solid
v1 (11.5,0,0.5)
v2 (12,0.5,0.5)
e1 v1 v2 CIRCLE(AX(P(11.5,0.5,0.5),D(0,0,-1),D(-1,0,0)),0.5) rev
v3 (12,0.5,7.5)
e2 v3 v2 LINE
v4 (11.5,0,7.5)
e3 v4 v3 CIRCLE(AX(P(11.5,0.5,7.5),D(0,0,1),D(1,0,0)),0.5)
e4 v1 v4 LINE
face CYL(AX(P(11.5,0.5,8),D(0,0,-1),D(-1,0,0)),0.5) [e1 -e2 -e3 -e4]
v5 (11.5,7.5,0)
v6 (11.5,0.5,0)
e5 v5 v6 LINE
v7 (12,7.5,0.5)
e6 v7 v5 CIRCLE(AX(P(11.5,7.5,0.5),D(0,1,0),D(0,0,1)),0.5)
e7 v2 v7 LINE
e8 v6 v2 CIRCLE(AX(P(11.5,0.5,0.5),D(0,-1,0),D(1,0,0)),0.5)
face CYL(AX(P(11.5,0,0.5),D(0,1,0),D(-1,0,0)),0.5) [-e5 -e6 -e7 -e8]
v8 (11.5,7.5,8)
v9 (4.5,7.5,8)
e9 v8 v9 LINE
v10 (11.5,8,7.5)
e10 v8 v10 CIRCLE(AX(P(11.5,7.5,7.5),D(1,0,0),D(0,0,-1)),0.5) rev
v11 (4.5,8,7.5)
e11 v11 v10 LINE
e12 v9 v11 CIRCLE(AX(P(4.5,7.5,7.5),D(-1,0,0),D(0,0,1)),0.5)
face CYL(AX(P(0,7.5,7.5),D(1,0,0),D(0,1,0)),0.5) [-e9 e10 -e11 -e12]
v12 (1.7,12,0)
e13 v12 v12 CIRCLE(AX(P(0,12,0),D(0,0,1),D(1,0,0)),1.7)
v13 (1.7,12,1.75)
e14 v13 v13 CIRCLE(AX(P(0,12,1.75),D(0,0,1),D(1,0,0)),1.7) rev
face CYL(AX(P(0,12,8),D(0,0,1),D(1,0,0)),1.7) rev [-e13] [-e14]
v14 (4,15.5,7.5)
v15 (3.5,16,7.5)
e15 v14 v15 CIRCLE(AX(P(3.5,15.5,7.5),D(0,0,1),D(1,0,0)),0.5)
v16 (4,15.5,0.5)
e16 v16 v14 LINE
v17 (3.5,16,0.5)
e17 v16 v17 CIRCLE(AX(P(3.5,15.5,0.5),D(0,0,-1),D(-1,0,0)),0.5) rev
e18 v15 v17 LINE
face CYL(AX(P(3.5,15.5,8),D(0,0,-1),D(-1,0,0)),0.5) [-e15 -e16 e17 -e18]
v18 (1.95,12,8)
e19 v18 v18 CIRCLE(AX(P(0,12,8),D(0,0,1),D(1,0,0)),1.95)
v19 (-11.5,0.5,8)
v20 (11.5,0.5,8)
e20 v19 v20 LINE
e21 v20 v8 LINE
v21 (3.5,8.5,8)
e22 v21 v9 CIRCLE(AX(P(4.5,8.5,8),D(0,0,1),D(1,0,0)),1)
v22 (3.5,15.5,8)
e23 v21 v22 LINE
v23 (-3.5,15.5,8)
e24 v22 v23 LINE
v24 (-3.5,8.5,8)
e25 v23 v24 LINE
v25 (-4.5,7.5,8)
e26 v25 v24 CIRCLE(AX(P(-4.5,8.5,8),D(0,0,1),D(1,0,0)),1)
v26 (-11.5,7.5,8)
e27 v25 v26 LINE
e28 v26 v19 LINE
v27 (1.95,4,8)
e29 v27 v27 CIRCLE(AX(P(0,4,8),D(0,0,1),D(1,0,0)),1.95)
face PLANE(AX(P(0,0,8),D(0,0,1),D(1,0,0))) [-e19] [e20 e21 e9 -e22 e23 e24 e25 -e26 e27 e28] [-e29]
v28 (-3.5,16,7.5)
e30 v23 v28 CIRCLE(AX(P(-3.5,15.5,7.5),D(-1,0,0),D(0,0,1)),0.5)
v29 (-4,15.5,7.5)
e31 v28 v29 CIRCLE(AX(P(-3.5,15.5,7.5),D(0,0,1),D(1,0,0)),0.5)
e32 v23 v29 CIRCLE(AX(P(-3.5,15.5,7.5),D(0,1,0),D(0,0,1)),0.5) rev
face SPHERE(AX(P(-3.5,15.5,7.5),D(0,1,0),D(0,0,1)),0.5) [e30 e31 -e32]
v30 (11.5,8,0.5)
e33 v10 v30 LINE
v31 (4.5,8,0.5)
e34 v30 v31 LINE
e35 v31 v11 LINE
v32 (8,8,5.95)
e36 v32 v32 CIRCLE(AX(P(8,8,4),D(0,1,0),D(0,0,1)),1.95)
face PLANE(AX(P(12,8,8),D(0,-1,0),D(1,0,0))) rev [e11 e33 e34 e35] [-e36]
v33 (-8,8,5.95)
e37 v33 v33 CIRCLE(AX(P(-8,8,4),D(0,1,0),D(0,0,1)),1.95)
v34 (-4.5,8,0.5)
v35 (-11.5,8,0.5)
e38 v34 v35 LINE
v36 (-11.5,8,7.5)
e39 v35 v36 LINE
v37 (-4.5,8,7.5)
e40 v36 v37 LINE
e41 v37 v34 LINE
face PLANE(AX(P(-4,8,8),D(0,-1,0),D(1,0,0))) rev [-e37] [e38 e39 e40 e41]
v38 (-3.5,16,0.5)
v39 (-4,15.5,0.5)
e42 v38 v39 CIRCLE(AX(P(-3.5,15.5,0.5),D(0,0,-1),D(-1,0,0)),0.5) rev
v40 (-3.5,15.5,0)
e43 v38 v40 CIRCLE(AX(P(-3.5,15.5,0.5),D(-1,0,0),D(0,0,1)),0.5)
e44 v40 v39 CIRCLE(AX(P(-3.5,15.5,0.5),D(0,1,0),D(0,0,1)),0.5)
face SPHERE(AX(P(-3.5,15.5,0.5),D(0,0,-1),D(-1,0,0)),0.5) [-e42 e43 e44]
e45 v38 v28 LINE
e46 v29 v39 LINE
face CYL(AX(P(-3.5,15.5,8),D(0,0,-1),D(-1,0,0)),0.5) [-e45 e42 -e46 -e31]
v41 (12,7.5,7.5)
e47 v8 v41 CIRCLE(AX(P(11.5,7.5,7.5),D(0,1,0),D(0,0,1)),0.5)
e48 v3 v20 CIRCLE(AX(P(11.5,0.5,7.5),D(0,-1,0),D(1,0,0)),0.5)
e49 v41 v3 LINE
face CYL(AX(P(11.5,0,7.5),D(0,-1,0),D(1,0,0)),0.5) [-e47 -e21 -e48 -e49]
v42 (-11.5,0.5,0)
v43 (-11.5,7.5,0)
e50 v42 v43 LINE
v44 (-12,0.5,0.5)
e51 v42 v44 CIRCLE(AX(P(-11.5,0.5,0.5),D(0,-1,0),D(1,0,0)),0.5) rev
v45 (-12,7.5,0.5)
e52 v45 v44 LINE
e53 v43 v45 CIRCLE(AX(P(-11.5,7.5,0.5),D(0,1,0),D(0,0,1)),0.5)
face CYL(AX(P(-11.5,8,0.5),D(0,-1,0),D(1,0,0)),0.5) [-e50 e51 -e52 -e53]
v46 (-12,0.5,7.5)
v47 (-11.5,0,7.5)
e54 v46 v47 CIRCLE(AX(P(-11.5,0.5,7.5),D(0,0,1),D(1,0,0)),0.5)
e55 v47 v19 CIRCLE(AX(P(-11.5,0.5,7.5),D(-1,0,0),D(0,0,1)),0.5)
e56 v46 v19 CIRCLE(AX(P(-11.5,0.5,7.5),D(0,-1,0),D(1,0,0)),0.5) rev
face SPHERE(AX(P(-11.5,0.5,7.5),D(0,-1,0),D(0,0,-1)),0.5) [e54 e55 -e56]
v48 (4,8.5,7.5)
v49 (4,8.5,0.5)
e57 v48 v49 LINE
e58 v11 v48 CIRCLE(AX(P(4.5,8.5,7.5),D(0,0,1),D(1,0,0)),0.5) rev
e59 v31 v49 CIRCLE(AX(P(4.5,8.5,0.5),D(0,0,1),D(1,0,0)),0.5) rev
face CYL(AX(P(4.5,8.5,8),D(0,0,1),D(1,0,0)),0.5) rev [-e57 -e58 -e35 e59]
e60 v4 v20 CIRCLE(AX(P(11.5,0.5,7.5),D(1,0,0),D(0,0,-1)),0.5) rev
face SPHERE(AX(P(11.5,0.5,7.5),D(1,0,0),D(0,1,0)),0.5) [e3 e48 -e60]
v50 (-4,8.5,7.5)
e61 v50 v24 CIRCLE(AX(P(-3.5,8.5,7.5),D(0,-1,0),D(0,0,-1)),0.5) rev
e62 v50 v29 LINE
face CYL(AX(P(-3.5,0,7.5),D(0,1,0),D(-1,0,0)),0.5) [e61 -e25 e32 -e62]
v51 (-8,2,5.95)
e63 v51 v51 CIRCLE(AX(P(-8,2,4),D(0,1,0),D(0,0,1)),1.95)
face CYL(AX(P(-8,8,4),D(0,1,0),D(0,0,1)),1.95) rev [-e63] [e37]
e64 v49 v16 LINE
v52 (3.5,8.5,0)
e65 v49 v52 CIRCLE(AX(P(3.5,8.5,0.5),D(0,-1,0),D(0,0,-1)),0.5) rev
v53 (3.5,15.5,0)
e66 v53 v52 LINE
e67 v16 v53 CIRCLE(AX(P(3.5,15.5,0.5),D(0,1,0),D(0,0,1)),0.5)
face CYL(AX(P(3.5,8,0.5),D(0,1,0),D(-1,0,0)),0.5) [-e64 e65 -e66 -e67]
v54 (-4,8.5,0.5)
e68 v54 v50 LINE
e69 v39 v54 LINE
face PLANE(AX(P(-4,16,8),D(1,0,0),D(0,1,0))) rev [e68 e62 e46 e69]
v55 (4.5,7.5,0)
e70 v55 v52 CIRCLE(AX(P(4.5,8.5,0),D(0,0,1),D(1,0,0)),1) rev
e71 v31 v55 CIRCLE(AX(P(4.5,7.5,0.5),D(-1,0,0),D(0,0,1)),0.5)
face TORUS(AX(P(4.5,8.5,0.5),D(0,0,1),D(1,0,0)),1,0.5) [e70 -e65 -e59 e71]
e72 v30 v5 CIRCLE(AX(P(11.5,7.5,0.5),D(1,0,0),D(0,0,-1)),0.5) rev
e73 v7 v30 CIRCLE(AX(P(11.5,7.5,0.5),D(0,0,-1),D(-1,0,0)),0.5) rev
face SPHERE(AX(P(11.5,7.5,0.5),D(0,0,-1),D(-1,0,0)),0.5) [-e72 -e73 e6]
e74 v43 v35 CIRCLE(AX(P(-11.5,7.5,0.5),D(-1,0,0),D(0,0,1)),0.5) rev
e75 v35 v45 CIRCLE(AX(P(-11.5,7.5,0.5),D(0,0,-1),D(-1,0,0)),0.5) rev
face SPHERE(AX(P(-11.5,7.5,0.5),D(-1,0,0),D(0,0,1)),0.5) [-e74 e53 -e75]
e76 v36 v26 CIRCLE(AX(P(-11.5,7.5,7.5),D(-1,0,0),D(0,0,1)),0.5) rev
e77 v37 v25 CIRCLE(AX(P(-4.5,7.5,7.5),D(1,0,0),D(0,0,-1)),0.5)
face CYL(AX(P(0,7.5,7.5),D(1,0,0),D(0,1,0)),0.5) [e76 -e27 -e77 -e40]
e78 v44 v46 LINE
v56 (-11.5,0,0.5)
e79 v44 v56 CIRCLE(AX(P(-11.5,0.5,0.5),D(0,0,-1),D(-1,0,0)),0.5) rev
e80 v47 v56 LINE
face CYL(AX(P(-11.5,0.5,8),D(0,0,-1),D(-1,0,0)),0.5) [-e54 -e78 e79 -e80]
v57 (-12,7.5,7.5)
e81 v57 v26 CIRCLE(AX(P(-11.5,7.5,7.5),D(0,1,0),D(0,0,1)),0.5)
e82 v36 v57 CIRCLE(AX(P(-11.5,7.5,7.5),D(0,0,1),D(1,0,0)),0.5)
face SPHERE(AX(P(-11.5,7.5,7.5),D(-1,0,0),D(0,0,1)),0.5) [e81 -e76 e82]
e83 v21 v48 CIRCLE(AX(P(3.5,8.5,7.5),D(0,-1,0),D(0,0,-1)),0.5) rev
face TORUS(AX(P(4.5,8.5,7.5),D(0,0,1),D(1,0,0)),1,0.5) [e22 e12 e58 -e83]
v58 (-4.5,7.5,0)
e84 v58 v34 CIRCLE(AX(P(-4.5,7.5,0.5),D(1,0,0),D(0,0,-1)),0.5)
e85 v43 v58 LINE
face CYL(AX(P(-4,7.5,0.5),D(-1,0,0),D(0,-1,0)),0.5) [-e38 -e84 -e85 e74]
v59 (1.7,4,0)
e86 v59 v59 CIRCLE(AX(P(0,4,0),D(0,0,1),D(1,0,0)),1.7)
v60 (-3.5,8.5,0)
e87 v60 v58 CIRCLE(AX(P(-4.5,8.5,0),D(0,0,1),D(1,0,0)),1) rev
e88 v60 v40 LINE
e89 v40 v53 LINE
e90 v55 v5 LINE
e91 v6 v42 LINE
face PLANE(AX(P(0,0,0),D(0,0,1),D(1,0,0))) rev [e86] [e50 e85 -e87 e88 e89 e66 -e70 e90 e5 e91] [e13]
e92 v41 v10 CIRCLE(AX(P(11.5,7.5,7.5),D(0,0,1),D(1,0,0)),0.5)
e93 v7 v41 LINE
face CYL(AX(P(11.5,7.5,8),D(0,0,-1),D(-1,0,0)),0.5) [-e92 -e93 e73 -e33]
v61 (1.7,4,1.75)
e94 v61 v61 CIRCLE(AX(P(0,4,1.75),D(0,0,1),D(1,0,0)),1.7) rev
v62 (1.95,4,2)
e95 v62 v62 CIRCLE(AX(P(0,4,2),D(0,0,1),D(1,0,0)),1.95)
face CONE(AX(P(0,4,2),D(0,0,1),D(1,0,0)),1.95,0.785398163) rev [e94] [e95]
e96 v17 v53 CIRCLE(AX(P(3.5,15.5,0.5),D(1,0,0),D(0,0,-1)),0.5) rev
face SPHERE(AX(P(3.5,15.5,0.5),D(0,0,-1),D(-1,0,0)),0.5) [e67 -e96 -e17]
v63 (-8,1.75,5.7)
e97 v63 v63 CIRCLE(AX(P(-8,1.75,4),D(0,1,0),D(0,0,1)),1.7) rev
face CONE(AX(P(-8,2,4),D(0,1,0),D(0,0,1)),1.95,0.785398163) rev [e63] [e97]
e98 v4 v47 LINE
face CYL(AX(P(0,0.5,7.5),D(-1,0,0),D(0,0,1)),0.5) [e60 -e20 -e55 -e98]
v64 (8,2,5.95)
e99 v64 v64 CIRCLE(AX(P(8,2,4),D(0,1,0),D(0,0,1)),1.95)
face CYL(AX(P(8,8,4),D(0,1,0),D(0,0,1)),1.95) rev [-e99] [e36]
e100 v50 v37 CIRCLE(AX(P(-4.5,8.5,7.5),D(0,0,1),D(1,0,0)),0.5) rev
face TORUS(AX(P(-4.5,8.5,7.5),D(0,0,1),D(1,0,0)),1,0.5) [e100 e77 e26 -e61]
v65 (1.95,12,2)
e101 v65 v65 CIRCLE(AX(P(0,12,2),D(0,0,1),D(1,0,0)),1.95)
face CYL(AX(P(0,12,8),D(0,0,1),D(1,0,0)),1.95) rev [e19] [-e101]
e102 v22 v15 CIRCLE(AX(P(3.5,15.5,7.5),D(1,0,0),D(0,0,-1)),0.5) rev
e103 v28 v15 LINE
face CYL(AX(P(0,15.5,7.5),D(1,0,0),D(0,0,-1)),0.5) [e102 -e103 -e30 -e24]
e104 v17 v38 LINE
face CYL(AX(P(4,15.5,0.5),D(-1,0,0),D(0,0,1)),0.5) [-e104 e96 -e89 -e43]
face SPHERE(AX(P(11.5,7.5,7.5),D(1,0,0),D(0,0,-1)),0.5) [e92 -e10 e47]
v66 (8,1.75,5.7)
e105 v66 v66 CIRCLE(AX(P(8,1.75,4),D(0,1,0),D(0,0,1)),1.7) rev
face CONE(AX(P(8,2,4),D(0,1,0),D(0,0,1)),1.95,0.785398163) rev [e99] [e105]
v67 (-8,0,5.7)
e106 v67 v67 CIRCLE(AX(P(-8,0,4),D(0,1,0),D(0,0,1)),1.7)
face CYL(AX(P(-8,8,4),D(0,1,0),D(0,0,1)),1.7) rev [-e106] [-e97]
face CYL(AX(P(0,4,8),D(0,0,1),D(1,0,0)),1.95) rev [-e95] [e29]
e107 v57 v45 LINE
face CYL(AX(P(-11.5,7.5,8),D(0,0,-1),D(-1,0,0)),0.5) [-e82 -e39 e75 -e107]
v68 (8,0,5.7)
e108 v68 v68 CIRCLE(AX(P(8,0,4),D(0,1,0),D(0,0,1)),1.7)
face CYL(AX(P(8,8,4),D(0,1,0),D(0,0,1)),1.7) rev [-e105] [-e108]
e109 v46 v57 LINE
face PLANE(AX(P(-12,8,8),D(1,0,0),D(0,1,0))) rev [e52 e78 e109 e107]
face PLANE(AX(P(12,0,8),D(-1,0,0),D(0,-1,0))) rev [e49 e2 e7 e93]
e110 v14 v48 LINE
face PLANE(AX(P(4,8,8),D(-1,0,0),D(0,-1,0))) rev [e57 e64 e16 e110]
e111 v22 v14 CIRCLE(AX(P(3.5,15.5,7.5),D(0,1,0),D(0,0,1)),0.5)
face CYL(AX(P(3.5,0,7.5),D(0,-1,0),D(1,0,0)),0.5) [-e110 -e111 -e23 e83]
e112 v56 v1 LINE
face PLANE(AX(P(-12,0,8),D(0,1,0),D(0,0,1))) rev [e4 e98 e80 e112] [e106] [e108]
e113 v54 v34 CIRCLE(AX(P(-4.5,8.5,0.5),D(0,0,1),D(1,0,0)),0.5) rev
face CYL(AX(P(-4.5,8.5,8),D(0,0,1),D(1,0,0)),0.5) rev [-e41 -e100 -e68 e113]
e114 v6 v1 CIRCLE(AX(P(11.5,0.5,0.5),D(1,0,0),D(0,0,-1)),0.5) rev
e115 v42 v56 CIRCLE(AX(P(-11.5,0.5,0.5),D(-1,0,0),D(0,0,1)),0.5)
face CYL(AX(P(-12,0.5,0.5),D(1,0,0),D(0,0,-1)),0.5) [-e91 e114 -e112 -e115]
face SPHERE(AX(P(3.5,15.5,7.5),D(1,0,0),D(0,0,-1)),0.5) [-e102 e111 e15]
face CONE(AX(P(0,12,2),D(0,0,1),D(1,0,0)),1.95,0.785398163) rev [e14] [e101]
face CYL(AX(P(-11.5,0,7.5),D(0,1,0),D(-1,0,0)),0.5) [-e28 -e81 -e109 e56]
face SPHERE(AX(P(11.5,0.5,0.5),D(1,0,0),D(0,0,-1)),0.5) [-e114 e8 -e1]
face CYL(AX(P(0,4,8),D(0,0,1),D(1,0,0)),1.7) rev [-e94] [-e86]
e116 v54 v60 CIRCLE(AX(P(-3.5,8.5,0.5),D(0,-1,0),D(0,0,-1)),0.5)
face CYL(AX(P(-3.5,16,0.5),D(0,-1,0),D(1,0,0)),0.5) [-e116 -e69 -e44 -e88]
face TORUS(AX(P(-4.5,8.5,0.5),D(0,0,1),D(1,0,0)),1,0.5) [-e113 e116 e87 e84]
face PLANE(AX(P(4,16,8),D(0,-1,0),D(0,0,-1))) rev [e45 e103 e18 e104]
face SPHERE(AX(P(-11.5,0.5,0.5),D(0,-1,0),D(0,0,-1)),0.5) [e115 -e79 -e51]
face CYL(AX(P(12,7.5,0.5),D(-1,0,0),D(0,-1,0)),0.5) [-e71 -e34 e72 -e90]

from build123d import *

# Parameters (mm, degrees)
BOSS_EXTRUDE1_DEPTH                      = 8
F_3_9_3_9_DIAMETER_HOLE1_D               = 3.9
F_3_9_3_9_DIAMETER_HOLE1_DEPTH           = 6
F_3_9_3_9_DIAMETER_HOLE1_TIP             = 1.95
F_3_9_3_9_DIAMETER_HOLE1_ON_FACE_2_D     = 3.9
F_3_9_3_9_DIAMETER_HOLE1_ON_FACE_2_DEPTH = 6
F_3_9_3_9_DIAMETER_HOLE1_ON_FACE_2_TIP   = 1.95
F_3_4_3_4_DIAMETER_HOLE1_OUTLINE_R       = 1.7
F_3_4_3_4_DIAMETER_HOLE1_DEPTH           = 1.7500001
F_3_4_3_4_DIAMETER_HOLE1_2_OUTLINE_R     = 1.7
F_3_4_3_4_DIAMETER_HOLE1_2_DEPTH         = 1.7500001
FILLET1_R                                = 0.5


# Read off the part's stored shape, not the designer's step: Ø3.4 (3.4) Diameter Hole1
with BuildPart() as part:
    # Sketch1 → Boss-Extrude1 (new body)
    with BuildSketch(Plane.XY):
        Polygon((-12, 0), (12, 0), (12, 8), (4, 8), (4, 16), (-4, 16), (-4, 8), (-12, 8), align=None)
    extrude(amount=BOSS_EXTRUDE1_DEPTH)

    # Ø3.9 (3.9) Diameter Hole1
    with Locations(Plane(origin=(0, 4, 8), x_dir=(1, 0, 0), z_dir=(0, 0, 1))):
        with Locations((0, 0), (0, 8)):
            Hole(F_3_9_3_9_DIAMETER_HOLE1_D / 2, depth=F_3_9_3_9_DIAMETER_HOLE1_DEPTH)
            with Locations((0, 0, -(F_3_9_3_9_DIAMETER_HOLE1_DEPTH + F_3_9_3_9_DIAMETER_HOLE1_TIP / 2))):  # 90° drill point
                Cone(0, F_3_9_3_9_DIAMETER_HOLE1_D / 2, F_3_9_3_9_DIAMETER_HOLE1_TIP, mode=Mode.SUBTRACT)

    # Ø3.9 (3.9) Diameter Hole1 on face 2
    with Locations(Plane(origin=(8, 8, 4), x_dir=(0, 0, 1), z_dir=(0, 1, 0))):
        with Locations((0, 0), (0, -16)):
            Hole(F_3_9_3_9_DIAMETER_HOLE1_ON_FACE_2_D / 2, depth=F_3_9_3_9_DIAMETER_HOLE1_ON_FACE_2_DEPTH)
            with Locations((0, 0, -(F_3_9_3_9_DIAMETER_HOLE1_ON_FACE_2_DEPTH + F_3_9_3_9_DIAMETER_HOLE1_ON_FACE_2_TIP / 2))):  # 90° drill point
                Cone(0, F_3_9_3_9_DIAMETER_HOLE1_ON_FACE_2_D / 2, F_3_9_3_9_DIAMETER_HOLE1_ON_FACE_2_TIP, mode=Mode.SUBTRACT)

    # Ø3.4 (3.4) Diameter Hole1 outline → Ø3.4 (3.4) Diameter Hole1 (cut)
    with BuildSketch(Plane(origin=(0, 0, 0), x_dir=(1, 0, 0), z_dir=(0, 1, 0))):
        with Locations((-8, -4)):
            Circle(F_3_4_3_4_DIAMETER_HOLE1_OUTLINE_R)
        with Locations((8, -4)):
            Circle(F_3_4_3_4_DIAMETER_HOLE1_OUTLINE_R)
    extrude(amount=F_3_4_3_4_DIAMETER_HOLE1_DEPTH, mode=Mode.SUBTRACT)

    # 3.4 _3.4_ Diameter Hole1 2 outline → 3.4 _3.4_ Diameter Hole1 2 (cut)
    with BuildSketch(Plane.XY):
        with Locations((0, 4)):
            Circle(F_3_4_3_4_DIAMETER_HOLE1_2_OUTLINE_R)
        with Locations((0, 12)):
            Circle(F_3_4_3_4_DIAMETER_HOLE1_2_OUTLINE_R)
    extrude(amount=F_3_4_3_4_DIAMETER_HOLE1_2_DEPTH, mode=Mode.SUBTRACT)

    # Fillet1
    fillet1_edges = [part.edges().sort_by_distance(p)[0] for p in [
        (8, 8, 0),
        (12, 4, 0),
        (0, 0, 0),
        (-12, 4, 0),
        (12, 4, 8),
        (-12, 8, 4),
        (-4, 8, 4),
        (-4, 16, 4),
        (4, 16, 4),
        (4, 8, 4),
        (12, 8, 4),
        (12, 0, 4),
        (-12, 0, 4),
        (8, 8, 8),
        (4, 12, 8),
        (0, 16, 8),
        (-4, 12, 8),
        (-8, 8, 8),
        (-12, 4, 8),
        (-8, 8, 0),
        (0, 0, 8),
        (-4, 12, 0),
        (0, 16, 0),
        (4, 12, 0),
    ]]
    fillet(fillet1_edges, radius=FILLET1_R)


solid = part.part
